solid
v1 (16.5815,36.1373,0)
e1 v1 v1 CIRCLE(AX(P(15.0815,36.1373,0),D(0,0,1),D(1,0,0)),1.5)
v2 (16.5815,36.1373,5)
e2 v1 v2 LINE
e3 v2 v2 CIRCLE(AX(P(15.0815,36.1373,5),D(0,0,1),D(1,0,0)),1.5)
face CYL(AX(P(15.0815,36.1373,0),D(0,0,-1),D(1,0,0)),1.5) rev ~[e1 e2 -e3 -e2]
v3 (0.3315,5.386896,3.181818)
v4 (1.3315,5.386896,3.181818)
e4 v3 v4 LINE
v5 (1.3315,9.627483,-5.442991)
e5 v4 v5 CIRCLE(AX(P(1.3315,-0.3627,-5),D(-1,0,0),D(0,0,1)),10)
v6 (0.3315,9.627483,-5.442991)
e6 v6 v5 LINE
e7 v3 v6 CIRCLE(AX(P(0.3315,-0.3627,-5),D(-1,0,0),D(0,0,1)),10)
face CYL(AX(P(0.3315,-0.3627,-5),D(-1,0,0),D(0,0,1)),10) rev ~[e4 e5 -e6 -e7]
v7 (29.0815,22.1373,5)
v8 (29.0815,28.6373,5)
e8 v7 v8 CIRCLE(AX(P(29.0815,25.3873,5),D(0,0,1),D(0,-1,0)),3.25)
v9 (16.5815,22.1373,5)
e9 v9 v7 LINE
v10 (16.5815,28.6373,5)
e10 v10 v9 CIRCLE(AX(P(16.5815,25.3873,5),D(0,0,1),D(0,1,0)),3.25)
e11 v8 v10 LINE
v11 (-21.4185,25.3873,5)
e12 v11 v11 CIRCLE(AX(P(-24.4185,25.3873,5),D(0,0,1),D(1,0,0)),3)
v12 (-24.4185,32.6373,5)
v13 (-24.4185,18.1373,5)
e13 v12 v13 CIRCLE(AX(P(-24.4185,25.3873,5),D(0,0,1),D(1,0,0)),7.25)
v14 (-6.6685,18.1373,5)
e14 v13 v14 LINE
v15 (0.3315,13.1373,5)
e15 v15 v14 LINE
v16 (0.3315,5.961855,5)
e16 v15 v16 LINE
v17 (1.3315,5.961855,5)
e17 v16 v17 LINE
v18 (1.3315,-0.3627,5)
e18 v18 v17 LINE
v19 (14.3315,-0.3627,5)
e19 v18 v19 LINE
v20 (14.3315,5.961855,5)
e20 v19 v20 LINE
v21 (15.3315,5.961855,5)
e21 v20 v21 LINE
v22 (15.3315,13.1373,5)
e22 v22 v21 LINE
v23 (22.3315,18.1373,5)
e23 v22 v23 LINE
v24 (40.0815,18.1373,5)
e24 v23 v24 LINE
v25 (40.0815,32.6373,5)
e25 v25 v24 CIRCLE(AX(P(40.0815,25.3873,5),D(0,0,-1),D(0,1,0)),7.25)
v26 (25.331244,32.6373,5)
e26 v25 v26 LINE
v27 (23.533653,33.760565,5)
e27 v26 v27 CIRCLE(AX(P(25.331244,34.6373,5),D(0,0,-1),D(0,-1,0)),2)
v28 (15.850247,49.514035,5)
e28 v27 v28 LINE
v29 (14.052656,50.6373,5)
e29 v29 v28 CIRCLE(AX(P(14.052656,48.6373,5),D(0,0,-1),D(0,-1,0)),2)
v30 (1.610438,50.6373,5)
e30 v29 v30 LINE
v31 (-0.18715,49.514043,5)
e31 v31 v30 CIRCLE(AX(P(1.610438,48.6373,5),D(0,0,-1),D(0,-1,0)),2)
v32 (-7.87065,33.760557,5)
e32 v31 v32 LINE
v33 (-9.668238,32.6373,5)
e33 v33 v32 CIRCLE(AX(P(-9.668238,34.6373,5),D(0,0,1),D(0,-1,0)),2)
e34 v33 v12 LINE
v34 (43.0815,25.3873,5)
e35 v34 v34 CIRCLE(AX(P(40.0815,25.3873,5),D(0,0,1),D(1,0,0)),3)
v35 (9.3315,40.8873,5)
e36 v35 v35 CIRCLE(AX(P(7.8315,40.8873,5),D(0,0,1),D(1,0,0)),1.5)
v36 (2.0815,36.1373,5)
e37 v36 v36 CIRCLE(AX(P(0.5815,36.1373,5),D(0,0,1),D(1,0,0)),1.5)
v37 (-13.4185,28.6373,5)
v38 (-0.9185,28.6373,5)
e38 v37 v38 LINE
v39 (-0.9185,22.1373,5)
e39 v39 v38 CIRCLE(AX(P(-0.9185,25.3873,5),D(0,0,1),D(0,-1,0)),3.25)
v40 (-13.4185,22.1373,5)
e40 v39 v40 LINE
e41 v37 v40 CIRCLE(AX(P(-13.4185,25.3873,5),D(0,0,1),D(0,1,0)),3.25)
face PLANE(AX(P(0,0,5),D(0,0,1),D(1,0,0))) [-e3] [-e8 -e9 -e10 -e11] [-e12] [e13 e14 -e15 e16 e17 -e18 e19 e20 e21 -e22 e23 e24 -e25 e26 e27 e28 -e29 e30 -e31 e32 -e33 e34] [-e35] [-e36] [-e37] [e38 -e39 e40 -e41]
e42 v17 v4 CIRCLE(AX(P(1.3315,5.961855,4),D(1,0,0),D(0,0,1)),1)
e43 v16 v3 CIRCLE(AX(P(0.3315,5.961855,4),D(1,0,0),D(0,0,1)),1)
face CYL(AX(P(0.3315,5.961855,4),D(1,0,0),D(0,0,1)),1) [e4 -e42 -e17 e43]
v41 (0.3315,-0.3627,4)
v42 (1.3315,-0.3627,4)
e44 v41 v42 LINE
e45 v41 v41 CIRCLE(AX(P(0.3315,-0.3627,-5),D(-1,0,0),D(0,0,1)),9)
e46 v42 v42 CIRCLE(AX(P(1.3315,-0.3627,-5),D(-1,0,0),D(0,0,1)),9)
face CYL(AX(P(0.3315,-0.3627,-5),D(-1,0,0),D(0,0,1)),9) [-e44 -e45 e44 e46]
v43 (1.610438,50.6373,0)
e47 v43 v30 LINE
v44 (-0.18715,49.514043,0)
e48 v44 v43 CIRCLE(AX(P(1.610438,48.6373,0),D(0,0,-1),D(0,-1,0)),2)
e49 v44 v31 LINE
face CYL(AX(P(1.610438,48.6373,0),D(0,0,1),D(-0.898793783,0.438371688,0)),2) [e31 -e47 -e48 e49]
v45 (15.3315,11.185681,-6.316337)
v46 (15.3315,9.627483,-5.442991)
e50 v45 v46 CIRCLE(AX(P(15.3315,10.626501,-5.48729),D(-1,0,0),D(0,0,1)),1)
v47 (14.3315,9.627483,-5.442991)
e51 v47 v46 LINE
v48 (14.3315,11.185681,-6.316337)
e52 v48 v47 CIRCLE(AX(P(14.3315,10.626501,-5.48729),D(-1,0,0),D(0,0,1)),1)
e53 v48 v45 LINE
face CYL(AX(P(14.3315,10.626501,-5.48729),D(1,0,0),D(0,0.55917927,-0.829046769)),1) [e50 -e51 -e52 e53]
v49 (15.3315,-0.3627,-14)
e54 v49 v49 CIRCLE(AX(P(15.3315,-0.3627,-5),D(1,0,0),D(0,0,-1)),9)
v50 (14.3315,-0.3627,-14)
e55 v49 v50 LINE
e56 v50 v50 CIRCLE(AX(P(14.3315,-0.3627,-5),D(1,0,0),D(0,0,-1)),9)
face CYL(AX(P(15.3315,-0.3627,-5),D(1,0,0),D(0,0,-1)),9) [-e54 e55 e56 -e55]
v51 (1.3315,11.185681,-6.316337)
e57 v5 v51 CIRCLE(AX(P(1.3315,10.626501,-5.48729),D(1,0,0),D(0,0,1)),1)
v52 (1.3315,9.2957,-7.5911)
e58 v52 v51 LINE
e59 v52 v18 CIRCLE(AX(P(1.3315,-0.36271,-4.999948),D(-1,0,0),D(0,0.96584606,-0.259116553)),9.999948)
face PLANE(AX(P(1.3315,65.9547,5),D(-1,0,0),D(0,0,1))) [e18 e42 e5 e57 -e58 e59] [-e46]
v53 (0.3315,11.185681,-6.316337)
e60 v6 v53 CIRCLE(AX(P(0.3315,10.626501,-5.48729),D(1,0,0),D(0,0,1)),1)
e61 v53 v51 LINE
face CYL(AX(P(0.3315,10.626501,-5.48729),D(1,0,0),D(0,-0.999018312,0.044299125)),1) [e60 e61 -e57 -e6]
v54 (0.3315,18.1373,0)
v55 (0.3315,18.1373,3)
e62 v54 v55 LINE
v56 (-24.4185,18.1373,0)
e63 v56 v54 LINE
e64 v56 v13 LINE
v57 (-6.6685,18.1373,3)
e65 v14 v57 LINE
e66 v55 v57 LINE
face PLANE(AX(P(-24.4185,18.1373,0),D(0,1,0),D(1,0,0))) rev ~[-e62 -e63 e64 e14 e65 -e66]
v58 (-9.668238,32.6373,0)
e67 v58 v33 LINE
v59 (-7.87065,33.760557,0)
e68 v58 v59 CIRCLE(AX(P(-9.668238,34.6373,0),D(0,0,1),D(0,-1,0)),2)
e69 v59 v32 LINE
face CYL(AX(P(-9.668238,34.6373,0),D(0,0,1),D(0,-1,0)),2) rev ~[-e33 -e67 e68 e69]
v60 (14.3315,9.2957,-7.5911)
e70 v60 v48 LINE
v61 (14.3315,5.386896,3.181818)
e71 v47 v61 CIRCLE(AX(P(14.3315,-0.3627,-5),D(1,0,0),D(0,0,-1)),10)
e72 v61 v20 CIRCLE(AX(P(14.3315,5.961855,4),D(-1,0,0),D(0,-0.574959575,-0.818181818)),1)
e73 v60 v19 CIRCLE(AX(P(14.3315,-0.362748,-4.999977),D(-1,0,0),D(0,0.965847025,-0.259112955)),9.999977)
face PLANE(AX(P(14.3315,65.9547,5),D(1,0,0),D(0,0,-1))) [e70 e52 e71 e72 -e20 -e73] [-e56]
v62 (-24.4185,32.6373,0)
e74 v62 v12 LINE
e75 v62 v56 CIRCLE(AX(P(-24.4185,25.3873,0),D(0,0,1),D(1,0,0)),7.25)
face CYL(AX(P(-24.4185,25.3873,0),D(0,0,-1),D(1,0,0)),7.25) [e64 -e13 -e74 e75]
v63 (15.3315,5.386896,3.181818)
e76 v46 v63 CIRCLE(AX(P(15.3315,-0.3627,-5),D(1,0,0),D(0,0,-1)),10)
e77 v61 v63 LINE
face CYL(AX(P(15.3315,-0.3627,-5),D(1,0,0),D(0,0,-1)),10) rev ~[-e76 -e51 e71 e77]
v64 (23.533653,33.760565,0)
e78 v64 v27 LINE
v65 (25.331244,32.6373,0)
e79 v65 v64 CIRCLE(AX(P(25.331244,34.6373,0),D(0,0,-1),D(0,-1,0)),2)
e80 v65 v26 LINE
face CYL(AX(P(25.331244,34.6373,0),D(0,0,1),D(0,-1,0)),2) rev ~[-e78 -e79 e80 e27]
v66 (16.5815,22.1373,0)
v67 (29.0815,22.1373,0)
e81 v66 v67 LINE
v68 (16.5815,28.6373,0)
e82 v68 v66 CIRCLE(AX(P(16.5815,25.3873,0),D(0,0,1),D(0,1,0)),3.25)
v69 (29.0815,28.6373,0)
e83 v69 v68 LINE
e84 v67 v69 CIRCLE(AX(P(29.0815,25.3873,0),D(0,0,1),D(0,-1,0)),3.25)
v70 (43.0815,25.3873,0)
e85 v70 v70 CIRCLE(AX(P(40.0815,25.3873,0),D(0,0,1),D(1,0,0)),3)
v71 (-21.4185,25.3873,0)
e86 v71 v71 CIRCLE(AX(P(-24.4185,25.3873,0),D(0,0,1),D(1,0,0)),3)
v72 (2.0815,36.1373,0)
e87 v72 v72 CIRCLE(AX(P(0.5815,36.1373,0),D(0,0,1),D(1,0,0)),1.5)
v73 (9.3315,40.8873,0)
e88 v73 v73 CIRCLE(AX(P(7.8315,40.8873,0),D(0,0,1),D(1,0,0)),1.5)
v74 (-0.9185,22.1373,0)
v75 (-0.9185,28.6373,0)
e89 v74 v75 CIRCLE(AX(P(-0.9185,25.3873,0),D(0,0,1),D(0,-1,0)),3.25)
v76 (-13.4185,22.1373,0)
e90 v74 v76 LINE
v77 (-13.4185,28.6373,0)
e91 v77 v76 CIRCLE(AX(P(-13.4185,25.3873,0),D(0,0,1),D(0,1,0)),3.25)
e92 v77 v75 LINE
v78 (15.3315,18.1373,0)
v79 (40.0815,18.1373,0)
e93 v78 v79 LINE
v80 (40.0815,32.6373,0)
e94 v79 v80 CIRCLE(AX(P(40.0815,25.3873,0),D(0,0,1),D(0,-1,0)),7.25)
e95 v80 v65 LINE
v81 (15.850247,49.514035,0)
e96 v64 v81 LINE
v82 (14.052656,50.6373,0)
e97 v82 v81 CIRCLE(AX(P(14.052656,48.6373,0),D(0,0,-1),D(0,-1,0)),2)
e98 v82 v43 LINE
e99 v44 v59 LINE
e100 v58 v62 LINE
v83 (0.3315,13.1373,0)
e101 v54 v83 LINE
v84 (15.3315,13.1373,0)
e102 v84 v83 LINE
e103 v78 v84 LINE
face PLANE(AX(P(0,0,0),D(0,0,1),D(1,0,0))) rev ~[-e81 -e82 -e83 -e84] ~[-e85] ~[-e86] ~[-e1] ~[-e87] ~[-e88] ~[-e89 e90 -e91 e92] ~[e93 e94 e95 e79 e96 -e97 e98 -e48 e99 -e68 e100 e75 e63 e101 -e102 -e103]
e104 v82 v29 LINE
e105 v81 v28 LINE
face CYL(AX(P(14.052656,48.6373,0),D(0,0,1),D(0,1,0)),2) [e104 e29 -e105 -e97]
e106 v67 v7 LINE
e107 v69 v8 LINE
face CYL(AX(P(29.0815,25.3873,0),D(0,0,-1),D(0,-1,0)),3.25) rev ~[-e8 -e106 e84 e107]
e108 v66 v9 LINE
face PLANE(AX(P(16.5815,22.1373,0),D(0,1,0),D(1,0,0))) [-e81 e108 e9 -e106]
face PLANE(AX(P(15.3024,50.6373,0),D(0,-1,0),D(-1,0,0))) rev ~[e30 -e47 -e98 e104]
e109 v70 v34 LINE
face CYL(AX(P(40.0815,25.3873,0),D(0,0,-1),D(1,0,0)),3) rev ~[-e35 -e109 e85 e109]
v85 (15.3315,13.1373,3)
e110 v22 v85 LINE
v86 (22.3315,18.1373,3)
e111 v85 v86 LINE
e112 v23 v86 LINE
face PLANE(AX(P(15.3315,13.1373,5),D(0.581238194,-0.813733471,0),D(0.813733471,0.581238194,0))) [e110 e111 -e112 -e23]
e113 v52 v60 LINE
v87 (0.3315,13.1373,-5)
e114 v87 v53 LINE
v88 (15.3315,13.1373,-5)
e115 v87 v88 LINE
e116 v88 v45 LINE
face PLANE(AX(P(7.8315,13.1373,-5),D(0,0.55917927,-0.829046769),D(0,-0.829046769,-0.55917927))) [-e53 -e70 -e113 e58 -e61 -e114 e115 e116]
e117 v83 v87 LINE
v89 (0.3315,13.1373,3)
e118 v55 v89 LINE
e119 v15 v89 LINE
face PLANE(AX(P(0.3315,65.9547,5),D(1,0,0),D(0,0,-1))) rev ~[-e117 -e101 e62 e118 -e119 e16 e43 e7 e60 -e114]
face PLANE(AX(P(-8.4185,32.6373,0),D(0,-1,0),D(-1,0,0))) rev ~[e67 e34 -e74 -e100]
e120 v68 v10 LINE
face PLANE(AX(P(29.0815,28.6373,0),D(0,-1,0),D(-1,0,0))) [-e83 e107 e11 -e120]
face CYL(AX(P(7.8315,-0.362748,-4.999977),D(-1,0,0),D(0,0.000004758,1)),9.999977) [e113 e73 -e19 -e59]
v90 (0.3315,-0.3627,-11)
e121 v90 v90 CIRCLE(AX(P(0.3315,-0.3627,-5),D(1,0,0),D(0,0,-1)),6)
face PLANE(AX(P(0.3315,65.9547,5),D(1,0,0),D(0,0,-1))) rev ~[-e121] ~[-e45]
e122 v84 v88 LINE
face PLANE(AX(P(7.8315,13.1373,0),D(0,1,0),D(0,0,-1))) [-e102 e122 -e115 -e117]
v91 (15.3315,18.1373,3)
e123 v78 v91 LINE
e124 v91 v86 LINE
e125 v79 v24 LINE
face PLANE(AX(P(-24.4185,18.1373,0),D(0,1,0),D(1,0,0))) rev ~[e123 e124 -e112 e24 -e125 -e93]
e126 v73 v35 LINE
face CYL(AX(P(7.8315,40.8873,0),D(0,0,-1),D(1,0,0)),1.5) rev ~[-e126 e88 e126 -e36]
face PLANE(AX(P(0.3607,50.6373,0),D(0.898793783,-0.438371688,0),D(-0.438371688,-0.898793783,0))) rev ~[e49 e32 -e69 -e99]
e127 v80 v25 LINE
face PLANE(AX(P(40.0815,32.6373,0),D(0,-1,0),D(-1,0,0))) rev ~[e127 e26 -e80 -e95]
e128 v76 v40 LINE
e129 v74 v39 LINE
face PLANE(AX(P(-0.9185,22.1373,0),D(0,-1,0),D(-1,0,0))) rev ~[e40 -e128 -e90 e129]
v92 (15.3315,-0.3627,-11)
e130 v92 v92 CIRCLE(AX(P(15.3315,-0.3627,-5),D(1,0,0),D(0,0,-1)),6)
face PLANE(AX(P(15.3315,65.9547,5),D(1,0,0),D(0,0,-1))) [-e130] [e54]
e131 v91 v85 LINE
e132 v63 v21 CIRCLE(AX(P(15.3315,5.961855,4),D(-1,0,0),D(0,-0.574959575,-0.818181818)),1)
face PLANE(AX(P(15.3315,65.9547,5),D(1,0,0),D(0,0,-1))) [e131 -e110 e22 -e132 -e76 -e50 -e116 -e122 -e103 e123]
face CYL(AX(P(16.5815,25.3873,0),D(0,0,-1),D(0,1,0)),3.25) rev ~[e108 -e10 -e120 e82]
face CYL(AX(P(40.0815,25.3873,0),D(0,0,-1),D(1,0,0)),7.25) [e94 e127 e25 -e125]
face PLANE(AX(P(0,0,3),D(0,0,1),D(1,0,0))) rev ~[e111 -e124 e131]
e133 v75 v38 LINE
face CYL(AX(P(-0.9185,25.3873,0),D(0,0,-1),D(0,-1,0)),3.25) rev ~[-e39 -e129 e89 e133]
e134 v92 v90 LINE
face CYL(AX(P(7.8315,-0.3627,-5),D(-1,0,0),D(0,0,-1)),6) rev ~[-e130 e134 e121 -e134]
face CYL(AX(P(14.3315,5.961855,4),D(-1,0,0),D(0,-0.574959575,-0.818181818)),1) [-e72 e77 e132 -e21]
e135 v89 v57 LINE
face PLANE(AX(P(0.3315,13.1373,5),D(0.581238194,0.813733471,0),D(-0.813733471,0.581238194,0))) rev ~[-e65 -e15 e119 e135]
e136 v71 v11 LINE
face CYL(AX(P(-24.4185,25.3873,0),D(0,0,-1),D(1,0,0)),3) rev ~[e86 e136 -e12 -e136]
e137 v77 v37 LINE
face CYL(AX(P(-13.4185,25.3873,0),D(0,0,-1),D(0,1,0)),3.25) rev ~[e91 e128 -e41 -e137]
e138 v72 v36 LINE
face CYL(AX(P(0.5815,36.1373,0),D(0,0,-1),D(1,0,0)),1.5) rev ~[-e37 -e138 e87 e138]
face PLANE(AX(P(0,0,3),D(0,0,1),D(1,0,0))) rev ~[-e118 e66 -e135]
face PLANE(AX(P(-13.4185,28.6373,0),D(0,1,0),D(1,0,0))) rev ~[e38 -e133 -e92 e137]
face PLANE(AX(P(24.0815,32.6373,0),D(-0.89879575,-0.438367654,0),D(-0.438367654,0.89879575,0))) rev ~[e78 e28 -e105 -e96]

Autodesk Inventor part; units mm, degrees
ref_plane "YZ Plane" through (0, 0, 0) normal (1, 0, 0) x (0, 1, 0)
ref_plane "XZ Plane" through (0, 0, 0) normal (0, 1, 0) x (-1, 0, 0)
sketch "Body" plane through (0, 0, 0) normal (0, 0, 1) x (1, 0, 0)
  line L0 (-42.1685, 50.6373) -> (57.8315, 50.6373) construction
  line L1 (-42.1685, 50.6373) -> (-42.1685, 45.6373) construction
  line L2 (-42.1685, 45.6373) -> (-31.6685, 45.6373) construction
  line L3 (-31.6685, 45.6373) -> (-31.6685, 18.1373) construction
  line L4 (-31.6685, 18.1373) -> (-42.1685, 18.1373) construction
  line L5 (-42.1685, 18.1373) -> (-42.1685, 13.1373) construction
  line L6 (-42.1685, 13.1373) -> (57.8315, 13.1373) construction
  line L7 (57.8315, 18.1373) -> (57.8315, 13.1373) construction
  line L8 (47.3315, 18.1373) -> (57.8315, 18.1373) construction
  line L9 (47.3315, 45.6373) -> (47.3315, 18.1373) construction
  line L10 (57.8315, 45.6373) -> (47.3315, 45.6373) construction
  line L11 (57.8315, 50.6373) -> (57.8315, 45.6373) construction
  circle A0 centre (40.0815, 25.3873) radius 3.25 construction
  arc A1 (28.5815, 34.3873) -> (28.5815, 37.8873) centre (28.5815, 36.1373) ccw construction
  line L12 (15.0815, 34.3873) -> (28.5815, 34.3873) construction
  arc A2 (15.0815, 37.8873) -> (15.0815, 34.3873) centre (15.0815, 36.1373) ccw construction
  line L13 (28.5815, 37.8873) -> (15.0815, 37.8873) construction
  line L14 (29.0815, 28.6373) -> (16.5815, 28.6373) projected
  arc A3 (29.0815, 22.1373) -> (29.0815, 28.6373) centre (29.0815, 25.3873) ccw projected
  line L15 (16.5815, 22.1373) -> (29.0815, 22.1373) projected
  arc A4 (16.5815, 28.6373) -> (16.5815, 22.1373) centre (16.5815, 25.3873) ccw projected
  line L16 (-13.4185, 28.6373) -> (-0.9185, 28.6373) projected
  arc A5 (-0.9185, 22.1373) -> (-0.9185, 28.6373) centre (-0.9185, 25.3873) ccw projected
  line L17 (-0.9185, 22.1373) -> (-13.4185, 22.1373) projected
  arc A6 (-13.4185, 28.6373) -> (-13.4185, 22.1373) centre (-13.4185, 25.3873) ccw projected
  arc A7 (-12.9185, 37.8873) -> (-12.9185, 34.3873) centre (-12.9185, 36.1373) ccw construction
  line L18 (-12.9185, 37.8873) -> (0.5815, 37.8873) construction
  arc A8 (0.5815, 34.3873) -> (0.5815, 37.8873) centre (0.5815, 36.1373) ccw construction
  line L19 (0.5815, 34.3873) -> (-12.9185, 34.3873) construction
  circle A9 centre (-24.4185, 25.3873) radius 3.25 construction
  line L20 (6.8315, 42.6373) -> (8.8315, 42.6373) construction
  arc A10 (8.8315, 39.1373) -> (8.8315, 42.6373) centre (8.8315, 40.8873) ccw construction
  line L21 (6.8315, 39.1373) -> (8.8315, 39.1373) construction
  arc A11 (6.8315, 42.6373) -> (6.8315, 39.1373) centre (6.8315, 40.8873) ccw construction
  circle A12 centre (40.0815, 25.3873) radius 7.25
  circle A13 centre (-24.4185, 25.3873) radius 7.25
  line L22 (40.0815, 25.3873) -> (40.0815, 18.1373) construction
  line L23 (-24.4185, 18.1373) -> (40.0815, 18.1373)
  line L24 (-24.4185, 25.3873) -> (-24.4185, 18.1373) construction
  line L25 (40.0815, 25.3873) -> (40.0815, 32.6373) construction
  line L26 (-24.4185, 25.3873) -> (-24.4185, 32.6373) construction
  line L27 (40.0815, 32.6373) -> (24.0815, 32.6373)
  line L28 (24.0815, 32.6373) -> (15.3024, 50.6373)
  line L29 (15.3024, 50.6373) -> (0.3607, 50.6373)
  line L30 (0.3607, 50.6373) -> (-8.4185, 32.6373)
  line L31 (-8.4185, 32.6373) -> (-24.4185, 32.6373)
  line L32 (8.8315, 40.8873) -> (6.8315, 40.8873) construction
  circle A14 centre (7.8315, 40.8873) radius 1.5
  circle A15 centre (0.5815, 36.1373) radius 1.5
  circle A16 centre (15.0815, 36.1373) radius 1.5
  circle A17 centre (40.0815, 25.3873) radius 3
  circle A18 centre (-24.4185, 25.3873) radius 3
  dimension "d2" = 16
  dimension "d3" = 16
  dimension "d4" = 116
  dimension "d8" = 3
  dimension "d9" = 3
  dimension "d10" = 3
  dimension "d11" = 6
  dimension "d12" = 6
extrude "BodyFeature" add sketch "Body" along normal blind 5
fillet "BodyFilletsFeature" radius 2 4 edges at (24.0815, 32.6373, 2.5) (-8.4185, 32.6373, 2.5) (0.3607, 50.6373, 2.5) (15.3024, 50.6373, 2.5)
ref_plane "MiddlePlane" through (7.8315, 65.9547, 5) normal (1, 0, 0) x (0, 0, -1)
sketch "PelvisSpineBase" plane through (7.8315, 65.9547, 5) normal (1, 0, 0) x (0, 0, -1)
  arc A0 (0, -66.3174) -> (12.5911, -56.659) centre (10, -66.3174) ccw
  circle A1 centre (10, -66.3174) radius 6
  line L0 (5, -33.3174) -> (5, -47.8174) construction
  line L1 (5, -47.8174) -> (0, -47.8174)
  line L2 (0, -47.8174) -> (0, -66.3174)
  line L3 (5, -47.8174) -> (5, -52.8174)
  line L4 (5, -52.8174) -> (10, -52.8174)
  line L5 (10, -52.8174) -> (12.5911, -56.659)
  dimension "d16" = 12
  dimension "d17" = 4
  dimension "d22" = 5
  dimension "d23" = 5
  dimension "d29" = 18.5
  dimension "d30" = 34
extrude "PelvisSpineBaseFeature" add sketch "PelvisSpineBase" along normal mid plane 15
sketch "AngleReinforce" plane through (0, 0, 5) normal (0, 0, 1) x (1, 0, 0)
  line L0 (15.3315, 18.1373) -> (15.3315, 13.1373)
  line L1 (15.3315, 13.1373) -> (15.3315, 18.1373) projected
  line L2 (15.3315, 13.1373) -> (22.3315, 18.1373)
  line L3 (15.3315, 18.1373) -> (40.0815, 18.1373) construction
  line L4 (15.3315, 18.1373) -> (22.3315, 18.1373)
  line L5 (0.3315, 18.1373) -> (0.3315, 13.1373)
  line L6 (0.3315, 18.1373) -> (0.3315, 13.1373) projected
  line L7 (0.3315, 13.1373) -> (-6.6685, 18.1373)
  line L8 (-24.4185, 18.1373) -> (0.3315, 18.1373) construction
  line L9 (0.3315, 18.1373) -> (-6.6685, 18.1373)
  dimension "d33" = 7
  dimension "d34" = 7
extrude "AngleReinforceFeature" add sketch "AngleReinforce" against normal blind 2
sketch "RightLip" plane through (15.3315, 65.9547, 5) normal (1, 0, 0) x (0, 0, -1)
  arc A0 (0, -66.3174) -> (12.5911, -56.659) centre (10, -66.3174) ccw projected
  circle A1 centre (10, -66.3174) radius 10
  circle A2 centre (10, -66.3174) radius 9
  dimension "d37" = 1
extrude "RightLipFeature" cut sketch "RightLip" against normal blind 1
sketch "LeftLip" plane through (0.3315, 65.9547, 5) normal (-1, 0, 0) x (0, 0, 1)
  arc A0 (-12.5911, -56.659) -> (0, -66.3174) centre (-10, -66.3174) ccw projected
  circle A1 centre (-10, -66.3174) radius 9
  circle A2 centre (-10, -66.3174) radius 10
  dimension "d40" = 1
extrude "LeftLipFeature" cut sketch "LeftLip" against normal blind 1
fillet "SharpEdgesFilletFeature" radius 1 4 edges at (0.8315, -0.3627, 5) (0.8315, 9.2958, -7.5911) (14.8315, 9.2958, -7.5911) (14.8315, -0.3627, 5)
equation "\"d3\" = d2"
properties part number "PelvisSpineLink"
